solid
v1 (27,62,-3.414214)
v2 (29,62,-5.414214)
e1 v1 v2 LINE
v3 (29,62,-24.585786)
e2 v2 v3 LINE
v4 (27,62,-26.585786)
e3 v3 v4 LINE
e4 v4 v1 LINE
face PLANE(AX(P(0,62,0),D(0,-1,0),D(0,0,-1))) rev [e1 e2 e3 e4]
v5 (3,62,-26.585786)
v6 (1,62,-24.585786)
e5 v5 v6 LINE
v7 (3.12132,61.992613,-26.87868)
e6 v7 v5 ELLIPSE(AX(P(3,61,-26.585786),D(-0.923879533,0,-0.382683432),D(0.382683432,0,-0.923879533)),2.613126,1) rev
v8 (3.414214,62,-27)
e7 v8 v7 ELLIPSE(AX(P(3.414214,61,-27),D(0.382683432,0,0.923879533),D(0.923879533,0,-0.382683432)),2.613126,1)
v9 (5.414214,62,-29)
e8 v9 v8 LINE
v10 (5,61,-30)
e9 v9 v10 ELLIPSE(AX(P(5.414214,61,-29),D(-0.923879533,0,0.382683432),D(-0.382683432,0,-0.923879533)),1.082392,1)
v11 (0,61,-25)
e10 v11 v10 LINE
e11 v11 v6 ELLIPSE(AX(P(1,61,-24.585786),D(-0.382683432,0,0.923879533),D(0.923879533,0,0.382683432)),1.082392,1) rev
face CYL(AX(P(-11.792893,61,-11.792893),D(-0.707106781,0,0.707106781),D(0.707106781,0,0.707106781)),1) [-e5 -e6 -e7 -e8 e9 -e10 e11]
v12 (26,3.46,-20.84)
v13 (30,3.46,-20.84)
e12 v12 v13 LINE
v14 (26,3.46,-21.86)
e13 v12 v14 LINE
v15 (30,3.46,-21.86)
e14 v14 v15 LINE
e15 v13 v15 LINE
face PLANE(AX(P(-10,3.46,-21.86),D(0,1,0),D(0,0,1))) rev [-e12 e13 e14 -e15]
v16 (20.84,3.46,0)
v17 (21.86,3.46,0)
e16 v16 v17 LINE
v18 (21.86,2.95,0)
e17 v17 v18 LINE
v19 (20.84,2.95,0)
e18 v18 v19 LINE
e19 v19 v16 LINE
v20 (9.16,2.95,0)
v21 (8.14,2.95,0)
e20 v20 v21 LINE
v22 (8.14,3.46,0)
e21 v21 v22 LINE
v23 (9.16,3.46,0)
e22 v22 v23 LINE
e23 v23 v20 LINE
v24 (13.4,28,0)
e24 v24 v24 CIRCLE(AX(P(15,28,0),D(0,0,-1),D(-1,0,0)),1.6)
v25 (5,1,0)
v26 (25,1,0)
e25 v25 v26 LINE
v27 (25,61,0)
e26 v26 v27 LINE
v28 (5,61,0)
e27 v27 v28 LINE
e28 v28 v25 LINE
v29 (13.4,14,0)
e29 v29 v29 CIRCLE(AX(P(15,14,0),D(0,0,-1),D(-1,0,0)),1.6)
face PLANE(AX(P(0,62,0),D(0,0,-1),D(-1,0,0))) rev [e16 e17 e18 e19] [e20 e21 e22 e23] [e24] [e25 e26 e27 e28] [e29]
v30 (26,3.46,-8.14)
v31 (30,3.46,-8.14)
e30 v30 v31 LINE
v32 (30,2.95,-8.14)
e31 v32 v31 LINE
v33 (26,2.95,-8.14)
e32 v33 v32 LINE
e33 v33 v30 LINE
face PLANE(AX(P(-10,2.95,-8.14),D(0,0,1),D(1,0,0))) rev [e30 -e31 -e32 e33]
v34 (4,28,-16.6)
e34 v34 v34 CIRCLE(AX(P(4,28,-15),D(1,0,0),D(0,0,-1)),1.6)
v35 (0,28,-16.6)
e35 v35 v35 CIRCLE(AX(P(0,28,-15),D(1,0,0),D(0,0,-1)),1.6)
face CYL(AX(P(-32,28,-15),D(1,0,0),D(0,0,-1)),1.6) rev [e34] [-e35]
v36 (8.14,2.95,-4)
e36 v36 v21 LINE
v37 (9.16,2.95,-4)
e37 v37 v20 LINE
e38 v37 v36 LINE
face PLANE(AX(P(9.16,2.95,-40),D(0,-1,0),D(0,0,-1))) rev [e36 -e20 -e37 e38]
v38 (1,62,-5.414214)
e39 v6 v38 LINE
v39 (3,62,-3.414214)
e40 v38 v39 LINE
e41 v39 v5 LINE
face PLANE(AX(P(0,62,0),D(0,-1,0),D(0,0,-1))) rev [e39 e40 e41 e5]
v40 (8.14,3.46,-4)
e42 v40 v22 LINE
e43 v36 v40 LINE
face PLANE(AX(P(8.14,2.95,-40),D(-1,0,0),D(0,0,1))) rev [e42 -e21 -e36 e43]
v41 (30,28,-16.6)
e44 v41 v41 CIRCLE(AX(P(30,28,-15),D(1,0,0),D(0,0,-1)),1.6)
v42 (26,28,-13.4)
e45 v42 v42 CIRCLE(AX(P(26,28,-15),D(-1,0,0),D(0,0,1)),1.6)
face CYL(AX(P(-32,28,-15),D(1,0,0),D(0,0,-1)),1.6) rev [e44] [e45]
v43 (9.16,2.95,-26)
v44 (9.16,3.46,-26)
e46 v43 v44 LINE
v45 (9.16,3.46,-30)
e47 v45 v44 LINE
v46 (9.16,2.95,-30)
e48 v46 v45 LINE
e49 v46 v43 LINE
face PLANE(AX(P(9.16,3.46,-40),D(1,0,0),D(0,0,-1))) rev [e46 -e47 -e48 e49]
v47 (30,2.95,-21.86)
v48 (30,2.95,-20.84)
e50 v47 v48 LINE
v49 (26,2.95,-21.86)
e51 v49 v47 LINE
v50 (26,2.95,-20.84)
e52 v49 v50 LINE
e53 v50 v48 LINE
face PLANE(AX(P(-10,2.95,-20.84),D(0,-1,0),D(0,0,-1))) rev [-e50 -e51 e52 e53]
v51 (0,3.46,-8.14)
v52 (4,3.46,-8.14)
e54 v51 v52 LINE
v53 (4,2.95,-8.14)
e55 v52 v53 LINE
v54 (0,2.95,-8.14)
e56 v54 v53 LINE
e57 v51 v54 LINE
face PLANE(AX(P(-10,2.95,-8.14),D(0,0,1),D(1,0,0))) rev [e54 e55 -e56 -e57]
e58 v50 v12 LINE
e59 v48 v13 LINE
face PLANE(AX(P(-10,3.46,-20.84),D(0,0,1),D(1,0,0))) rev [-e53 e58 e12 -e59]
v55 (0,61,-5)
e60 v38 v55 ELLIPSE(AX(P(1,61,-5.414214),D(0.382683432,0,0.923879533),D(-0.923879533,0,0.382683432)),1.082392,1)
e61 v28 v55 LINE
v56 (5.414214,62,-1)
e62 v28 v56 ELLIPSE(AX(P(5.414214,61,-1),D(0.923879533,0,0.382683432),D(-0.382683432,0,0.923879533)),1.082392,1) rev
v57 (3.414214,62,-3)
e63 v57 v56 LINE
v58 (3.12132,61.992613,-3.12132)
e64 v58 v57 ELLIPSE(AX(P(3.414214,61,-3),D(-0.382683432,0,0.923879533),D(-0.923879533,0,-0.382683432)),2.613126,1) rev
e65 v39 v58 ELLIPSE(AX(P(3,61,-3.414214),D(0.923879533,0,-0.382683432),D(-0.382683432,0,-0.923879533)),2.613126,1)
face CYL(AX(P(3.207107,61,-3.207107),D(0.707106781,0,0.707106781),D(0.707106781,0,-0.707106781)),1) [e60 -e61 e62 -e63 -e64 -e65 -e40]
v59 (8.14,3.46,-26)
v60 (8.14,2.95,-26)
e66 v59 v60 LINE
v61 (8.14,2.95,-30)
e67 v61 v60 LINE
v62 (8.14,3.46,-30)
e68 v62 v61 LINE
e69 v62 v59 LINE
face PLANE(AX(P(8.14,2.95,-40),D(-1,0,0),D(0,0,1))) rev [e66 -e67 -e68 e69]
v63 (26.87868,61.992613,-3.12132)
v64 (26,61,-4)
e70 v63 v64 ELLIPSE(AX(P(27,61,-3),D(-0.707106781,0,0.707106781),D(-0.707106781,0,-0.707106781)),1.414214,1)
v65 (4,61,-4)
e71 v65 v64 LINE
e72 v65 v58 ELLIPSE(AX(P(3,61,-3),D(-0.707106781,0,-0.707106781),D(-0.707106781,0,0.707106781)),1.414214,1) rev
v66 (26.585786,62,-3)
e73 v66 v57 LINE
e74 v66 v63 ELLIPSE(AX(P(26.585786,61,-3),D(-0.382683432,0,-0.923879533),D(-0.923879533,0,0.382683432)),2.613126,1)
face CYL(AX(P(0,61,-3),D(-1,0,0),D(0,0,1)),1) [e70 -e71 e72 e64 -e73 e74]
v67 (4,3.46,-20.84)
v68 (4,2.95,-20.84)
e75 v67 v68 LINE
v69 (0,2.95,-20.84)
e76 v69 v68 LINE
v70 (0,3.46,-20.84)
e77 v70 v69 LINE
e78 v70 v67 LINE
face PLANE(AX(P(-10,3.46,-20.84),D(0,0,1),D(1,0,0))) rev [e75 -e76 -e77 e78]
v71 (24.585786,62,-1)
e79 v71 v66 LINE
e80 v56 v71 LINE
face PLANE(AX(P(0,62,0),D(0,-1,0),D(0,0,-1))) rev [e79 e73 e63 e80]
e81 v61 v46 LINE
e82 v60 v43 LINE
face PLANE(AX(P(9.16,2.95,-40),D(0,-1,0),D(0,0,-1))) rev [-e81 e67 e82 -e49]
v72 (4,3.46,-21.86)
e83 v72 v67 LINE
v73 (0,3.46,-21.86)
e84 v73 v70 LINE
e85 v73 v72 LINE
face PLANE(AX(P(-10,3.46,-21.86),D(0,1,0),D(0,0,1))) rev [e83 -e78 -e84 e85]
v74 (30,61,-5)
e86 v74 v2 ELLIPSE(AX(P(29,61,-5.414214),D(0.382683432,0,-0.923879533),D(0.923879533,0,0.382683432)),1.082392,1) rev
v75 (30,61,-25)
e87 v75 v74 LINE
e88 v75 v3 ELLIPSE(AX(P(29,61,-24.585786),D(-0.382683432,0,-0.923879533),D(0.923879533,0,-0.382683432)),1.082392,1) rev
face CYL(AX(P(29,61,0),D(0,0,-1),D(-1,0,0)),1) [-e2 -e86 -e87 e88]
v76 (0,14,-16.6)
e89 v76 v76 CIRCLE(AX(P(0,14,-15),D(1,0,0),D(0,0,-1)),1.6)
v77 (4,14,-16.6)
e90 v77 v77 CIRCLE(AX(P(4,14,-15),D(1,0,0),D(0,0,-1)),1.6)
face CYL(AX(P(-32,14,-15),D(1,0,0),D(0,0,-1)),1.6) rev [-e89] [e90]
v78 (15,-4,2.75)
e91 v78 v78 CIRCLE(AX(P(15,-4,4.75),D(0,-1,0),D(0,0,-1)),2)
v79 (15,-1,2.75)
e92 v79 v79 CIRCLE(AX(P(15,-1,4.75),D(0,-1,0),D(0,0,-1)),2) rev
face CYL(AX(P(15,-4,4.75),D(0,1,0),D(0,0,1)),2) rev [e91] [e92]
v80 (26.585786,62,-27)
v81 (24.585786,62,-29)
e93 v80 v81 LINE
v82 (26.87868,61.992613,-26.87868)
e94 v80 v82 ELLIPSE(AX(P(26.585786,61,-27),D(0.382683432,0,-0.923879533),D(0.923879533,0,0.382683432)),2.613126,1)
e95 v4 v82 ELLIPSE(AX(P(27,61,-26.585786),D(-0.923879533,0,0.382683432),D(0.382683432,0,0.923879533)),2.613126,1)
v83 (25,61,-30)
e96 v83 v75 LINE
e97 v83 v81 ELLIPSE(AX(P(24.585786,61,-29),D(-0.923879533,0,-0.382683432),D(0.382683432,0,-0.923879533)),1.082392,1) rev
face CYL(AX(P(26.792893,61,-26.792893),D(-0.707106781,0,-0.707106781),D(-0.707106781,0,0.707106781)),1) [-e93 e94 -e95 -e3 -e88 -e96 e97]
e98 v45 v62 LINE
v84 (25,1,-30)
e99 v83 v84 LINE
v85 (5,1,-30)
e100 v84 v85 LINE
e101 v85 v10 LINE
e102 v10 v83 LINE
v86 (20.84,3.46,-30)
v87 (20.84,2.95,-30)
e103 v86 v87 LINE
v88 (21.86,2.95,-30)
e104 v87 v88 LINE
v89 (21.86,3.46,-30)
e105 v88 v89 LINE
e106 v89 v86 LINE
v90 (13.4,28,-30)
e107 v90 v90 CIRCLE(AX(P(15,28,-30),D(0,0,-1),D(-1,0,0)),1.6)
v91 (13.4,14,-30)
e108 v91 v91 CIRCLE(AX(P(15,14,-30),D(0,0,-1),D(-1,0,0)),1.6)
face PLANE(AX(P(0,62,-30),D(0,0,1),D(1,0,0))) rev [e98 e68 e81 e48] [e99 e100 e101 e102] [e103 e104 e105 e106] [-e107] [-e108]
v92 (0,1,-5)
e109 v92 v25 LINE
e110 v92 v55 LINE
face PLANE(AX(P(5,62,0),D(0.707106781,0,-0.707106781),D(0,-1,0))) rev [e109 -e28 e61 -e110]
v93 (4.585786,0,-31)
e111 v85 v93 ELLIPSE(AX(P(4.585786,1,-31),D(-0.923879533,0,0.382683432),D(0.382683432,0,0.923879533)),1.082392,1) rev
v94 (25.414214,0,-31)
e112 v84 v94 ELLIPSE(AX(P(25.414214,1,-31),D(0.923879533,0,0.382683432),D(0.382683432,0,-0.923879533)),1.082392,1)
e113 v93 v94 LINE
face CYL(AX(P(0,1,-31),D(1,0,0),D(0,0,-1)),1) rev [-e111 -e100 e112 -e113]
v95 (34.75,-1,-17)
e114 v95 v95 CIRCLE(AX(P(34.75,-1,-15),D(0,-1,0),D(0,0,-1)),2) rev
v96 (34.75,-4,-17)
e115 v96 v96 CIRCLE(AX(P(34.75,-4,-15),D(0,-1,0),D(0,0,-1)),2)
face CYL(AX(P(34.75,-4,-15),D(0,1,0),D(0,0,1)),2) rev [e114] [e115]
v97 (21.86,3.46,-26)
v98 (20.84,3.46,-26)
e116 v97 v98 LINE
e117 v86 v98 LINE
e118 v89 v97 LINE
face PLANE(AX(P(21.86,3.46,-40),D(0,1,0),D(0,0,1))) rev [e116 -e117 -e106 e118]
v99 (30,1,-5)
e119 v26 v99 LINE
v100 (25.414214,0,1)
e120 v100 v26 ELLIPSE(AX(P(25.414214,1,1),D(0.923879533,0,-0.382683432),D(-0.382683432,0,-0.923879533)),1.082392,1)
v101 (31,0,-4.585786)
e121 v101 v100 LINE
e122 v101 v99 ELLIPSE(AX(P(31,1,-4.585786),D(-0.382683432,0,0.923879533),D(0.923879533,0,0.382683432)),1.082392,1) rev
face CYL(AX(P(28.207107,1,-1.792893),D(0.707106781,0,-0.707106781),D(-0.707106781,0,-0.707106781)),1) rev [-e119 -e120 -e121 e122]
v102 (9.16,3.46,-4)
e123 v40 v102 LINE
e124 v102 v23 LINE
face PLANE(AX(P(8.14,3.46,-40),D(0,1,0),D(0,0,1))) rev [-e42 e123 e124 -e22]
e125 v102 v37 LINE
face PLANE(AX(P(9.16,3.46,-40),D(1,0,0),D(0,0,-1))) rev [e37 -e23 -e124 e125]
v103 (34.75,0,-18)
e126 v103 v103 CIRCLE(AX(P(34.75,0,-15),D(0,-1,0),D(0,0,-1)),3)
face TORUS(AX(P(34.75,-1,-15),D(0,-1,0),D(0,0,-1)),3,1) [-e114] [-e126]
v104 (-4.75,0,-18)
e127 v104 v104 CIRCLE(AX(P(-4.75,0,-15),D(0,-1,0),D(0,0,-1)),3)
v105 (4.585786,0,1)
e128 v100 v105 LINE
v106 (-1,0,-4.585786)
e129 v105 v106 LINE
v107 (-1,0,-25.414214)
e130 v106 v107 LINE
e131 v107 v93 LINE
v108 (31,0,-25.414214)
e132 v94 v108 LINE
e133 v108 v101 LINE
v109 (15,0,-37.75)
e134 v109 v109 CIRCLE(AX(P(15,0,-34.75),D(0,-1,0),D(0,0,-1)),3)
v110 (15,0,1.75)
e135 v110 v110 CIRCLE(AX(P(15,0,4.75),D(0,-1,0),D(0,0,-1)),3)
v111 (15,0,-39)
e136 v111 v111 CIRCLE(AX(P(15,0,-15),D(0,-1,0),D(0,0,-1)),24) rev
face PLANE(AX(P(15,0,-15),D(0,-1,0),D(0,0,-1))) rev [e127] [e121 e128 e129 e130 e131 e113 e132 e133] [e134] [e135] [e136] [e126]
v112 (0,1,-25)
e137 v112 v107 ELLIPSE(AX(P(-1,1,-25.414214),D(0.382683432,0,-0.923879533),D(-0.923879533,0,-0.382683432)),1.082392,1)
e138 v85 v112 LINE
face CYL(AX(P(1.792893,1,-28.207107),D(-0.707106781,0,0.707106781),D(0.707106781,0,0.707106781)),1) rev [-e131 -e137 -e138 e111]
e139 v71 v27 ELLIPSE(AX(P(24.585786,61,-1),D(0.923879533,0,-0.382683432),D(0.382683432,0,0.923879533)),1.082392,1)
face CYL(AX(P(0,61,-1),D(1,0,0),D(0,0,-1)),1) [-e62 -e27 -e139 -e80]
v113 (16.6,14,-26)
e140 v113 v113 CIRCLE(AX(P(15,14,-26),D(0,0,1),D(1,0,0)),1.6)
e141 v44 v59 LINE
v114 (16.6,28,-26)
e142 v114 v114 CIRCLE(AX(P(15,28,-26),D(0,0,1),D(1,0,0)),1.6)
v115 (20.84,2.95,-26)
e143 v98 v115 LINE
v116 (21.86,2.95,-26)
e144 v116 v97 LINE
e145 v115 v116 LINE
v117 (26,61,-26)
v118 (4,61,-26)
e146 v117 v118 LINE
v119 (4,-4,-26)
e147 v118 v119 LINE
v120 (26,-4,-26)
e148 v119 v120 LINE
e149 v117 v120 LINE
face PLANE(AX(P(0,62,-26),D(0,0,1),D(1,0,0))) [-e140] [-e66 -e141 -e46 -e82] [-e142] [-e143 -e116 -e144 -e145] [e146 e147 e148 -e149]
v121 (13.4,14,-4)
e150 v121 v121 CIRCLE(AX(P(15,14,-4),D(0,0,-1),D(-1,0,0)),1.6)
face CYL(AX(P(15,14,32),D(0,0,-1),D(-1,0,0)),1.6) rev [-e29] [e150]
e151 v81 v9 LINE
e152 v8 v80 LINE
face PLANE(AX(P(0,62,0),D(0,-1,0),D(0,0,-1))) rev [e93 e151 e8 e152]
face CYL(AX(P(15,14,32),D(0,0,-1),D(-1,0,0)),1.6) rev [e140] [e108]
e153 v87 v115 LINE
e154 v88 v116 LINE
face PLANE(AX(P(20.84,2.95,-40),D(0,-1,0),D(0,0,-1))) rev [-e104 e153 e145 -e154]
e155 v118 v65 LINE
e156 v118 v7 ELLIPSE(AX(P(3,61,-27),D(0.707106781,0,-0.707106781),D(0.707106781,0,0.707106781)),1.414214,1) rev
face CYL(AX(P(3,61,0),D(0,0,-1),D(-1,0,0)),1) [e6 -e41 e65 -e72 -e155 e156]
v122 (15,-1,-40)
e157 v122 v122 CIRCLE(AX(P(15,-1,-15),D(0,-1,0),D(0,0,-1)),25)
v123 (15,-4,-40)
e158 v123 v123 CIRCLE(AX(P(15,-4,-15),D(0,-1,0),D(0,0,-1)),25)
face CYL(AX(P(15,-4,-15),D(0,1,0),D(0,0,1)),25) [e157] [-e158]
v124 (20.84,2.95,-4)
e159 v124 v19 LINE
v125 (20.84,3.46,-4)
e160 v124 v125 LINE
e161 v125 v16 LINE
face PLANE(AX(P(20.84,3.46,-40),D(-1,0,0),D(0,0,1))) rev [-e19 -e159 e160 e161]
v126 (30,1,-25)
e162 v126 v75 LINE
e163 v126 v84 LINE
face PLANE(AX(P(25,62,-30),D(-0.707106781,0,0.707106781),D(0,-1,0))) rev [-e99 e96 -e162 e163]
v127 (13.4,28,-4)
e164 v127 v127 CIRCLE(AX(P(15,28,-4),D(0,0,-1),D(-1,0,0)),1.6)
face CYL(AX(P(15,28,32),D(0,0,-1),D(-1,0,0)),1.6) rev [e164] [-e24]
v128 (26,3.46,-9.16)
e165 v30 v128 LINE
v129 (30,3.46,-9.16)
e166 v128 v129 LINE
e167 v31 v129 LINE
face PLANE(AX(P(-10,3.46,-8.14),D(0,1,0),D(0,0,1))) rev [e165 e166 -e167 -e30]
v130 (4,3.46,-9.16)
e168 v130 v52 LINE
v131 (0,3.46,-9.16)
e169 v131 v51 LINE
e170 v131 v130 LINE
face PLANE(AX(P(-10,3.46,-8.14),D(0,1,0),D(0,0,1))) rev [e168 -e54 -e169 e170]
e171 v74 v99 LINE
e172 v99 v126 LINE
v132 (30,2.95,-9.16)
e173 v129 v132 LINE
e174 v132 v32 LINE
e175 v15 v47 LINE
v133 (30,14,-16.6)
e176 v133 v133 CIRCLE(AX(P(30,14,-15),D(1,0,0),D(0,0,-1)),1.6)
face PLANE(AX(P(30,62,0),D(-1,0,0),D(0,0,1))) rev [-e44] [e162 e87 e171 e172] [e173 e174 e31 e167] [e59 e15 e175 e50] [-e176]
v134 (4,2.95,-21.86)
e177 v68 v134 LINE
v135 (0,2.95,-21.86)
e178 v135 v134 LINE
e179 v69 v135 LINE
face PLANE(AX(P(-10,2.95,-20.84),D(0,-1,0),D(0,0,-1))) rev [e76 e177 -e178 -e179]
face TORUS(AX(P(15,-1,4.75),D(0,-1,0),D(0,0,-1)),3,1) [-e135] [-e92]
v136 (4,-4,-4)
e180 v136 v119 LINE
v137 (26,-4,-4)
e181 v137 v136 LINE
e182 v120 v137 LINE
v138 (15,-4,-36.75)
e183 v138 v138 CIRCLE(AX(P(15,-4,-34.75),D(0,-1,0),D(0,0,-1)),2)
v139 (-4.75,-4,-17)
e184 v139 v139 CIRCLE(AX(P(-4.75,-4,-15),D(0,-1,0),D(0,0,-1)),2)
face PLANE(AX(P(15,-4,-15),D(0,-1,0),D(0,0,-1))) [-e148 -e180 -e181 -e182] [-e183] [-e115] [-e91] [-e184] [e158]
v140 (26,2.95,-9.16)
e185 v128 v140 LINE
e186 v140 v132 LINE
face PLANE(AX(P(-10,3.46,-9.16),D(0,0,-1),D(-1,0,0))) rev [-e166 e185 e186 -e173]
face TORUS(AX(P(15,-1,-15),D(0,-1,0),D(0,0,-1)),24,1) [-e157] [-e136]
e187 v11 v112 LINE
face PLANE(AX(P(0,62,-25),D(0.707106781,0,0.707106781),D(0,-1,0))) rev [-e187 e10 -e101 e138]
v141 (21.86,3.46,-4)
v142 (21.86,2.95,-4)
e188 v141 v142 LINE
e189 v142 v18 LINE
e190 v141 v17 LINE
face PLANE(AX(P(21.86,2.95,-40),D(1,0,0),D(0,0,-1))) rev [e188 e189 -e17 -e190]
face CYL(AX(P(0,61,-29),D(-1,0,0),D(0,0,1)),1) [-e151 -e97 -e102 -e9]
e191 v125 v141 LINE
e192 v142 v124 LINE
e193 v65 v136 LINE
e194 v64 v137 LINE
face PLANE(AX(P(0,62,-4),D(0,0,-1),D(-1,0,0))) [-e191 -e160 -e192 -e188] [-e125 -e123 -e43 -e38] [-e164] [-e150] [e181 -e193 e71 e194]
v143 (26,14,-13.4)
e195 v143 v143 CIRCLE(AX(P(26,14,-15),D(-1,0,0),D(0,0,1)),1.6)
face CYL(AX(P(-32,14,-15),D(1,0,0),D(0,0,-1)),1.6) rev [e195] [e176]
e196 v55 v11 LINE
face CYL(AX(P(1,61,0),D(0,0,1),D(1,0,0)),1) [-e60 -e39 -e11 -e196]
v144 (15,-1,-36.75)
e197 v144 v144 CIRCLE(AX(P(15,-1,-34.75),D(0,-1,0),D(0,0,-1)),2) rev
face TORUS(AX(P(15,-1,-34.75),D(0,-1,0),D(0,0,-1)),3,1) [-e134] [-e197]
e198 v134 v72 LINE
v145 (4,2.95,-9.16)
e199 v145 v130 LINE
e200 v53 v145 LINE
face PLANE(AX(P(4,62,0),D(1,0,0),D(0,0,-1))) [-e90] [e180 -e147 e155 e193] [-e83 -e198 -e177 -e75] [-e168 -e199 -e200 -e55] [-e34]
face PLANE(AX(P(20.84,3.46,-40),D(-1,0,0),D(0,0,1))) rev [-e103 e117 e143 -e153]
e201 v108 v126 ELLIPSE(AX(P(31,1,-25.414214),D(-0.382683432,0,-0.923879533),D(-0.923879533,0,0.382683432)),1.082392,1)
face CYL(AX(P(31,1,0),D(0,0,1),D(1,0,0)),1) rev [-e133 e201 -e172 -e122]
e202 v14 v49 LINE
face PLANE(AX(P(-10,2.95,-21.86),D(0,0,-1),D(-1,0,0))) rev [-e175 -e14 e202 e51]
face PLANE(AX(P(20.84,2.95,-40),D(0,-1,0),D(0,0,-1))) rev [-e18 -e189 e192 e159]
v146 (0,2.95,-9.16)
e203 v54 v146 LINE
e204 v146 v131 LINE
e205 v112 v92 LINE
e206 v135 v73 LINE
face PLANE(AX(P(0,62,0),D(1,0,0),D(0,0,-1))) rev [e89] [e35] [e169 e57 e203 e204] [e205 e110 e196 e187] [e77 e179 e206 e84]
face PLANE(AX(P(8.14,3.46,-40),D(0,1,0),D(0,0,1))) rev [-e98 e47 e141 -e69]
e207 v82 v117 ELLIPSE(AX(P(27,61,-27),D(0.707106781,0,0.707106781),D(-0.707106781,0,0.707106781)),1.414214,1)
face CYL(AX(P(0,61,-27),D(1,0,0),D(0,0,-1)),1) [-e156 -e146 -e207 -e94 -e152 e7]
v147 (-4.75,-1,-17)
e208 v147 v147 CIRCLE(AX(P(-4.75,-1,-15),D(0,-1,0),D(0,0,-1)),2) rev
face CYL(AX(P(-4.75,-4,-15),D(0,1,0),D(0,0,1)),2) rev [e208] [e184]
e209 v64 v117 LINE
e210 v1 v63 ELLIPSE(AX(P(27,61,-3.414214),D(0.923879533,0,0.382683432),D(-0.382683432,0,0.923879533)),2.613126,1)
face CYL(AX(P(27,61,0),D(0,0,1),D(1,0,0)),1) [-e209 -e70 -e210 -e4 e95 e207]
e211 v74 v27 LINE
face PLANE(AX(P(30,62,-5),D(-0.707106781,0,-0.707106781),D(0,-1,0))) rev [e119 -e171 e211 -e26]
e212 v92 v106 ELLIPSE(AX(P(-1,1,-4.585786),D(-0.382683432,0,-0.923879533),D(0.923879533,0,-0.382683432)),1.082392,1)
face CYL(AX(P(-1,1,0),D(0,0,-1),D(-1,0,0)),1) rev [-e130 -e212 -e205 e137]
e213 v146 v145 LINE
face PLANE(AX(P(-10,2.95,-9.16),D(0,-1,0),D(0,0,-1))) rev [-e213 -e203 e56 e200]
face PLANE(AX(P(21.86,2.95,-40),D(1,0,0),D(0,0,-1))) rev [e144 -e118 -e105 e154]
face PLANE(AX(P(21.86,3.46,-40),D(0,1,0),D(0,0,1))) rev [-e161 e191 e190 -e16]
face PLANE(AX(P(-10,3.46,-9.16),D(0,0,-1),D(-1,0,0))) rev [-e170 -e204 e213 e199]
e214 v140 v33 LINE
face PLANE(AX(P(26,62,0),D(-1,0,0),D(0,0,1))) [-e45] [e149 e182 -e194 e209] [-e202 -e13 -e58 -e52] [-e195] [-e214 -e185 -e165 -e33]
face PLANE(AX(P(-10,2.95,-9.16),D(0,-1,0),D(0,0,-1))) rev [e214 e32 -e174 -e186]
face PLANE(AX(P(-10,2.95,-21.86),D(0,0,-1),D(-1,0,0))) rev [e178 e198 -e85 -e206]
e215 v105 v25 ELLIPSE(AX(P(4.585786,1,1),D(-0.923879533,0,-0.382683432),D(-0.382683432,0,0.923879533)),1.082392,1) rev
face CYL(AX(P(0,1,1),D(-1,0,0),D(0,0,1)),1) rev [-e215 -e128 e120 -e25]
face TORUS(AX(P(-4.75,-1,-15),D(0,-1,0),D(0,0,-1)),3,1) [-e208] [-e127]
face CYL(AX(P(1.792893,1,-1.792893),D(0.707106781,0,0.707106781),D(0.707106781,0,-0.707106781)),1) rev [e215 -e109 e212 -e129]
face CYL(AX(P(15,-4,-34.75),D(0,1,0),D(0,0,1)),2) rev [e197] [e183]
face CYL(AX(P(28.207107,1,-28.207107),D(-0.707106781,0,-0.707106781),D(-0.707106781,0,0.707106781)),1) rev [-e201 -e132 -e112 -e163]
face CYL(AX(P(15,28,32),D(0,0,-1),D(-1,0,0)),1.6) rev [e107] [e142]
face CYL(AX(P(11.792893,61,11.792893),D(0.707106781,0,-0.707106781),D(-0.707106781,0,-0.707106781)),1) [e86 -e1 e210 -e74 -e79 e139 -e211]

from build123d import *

# Parameters (mm, degrees)
SKETCH1_W           = 30
SKETCH1_H           = 30
BOSS_EXTRUDE1_DEPTH = 62
SHELL1_T            = -4
SKETCH2_R           = 1.6
CUT_EXTRUDE1_DEPTH  = 62
SKETCH3_R           = 25
SKETCH3_R_2         = 2
SKETCH3_W           = 22
SKETCH3_H           = 22
BOSS_EXTRUDE2_DEPTH = 4
CIRPATTERN1_COUNT   = 2
CIRPATTERN1_ANGLE   = 90
CHAMFER1_SIZE       = 5
FILLET1_R           = 1
FILLET2_R           = 1
SKETCH4_W           = 1.02
SKETCH4_H           = 0.51
CUT_EXTRUDE2_DEPTH  = 83.097503007
CIRPATTERN2_COUNT   = 2
CIRPATTERN2_ANGLE   = 90


with BuildPart() as part:
    # Sketch1 → Boss-Extrude1 (new body)
    with BuildSketch(Plane(origin=(0, 0, 0), x_dir=(1, 0, 0), z_dir=(0, 1, 0))):
        with Locations((15, 15)):
            Rectangle(SKETCH1_W, SKETCH1_H)
    extrude(amount=BOSS_EXTRUDE1_DEPTH)

    # Shell1
    shell1_openings = [part.faces().sort_by_distance(p)[0] for p in [
        (15, 62, -15),
        (15, 0, -15),
    ]]
    offset(amount=SHELL1_T, openings=shell1_openings, kind=Kind.INTERSECTION)

    # Sketch2 → Cut-Extrude1 (cut)
    with BuildSketch(Plane(origin=(30, 0, 0), x_dir=(0, 0, -1), z_dir=(1, 0, 0))):
        with Locations((15, 14)):
            Circle(SKETCH2_R)
        with Locations((15, 28)):
            Circle(SKETCH2_R)
    cut_extrude1 = extrude(amount=-CUT_EXTRUDE1_DEPTH, mode=Mode.SUBTRACT)

    # Sketch3 → Boss-Extrude2 (add)
    with BuildSketch(Plane.XZ):
        with Locations(Location((15, -15, 0), (0, 0, 270))):
            Circle(SKETCH3_R)
        with Locations(Location((34.75, -15, 0), (0, 0, 270))):
            Circle(SKETCH3_R_2, mode=Mode.SUBTRACT)
        with Locations(Location((15, -34.75, 0), (0, 0, 270))):
            Circle(SKETCH3_R_2, mode=Mode.SUBTRACT)
        with Locations(Location((-4.75, -15, 0), (0, 0, 270))):
            Circle(SKETCH3_R_2, mode=Mode.SUBTRACT)
        with Locations(Location((15, 4.75, 0), (0, 0, 270))):
            Circle(SKETCH3_R_2, mode=Mode.SUBTRACT)
        with Locations((15, -15)):
            Rectangle(SKETCH3_W, SKETCH3_H, mode=Mode.SUBTRACT)
    extrude(amount=BOSS_EXTRUDE2_DEPTH)

    # CirPattern1: Cut-Extrude1 ×2 about axis
    cirpattern1_axis = Axis((15, -4, -15), (0, 1, 0))
    for i in range(1, CIRPATTERN1_COUNT):
        add(cut_extrude1.rotate(cirpattern1_axis, i * CIRPATTERN1_ANGLE / (CIRPATTERN1_COUNT - 1)), mode=Mode.SUBTRACT)

    # Chamfer1
    chamfer1_edges = [part.edges().sort_by_distance(p)[0] for p in [
        (0, 31, -30),
        (30, 31, -30),
        (30, 31, 0),
        (0, 31, 0),
    ]]
    chamfer(chamfer1_edges, length=CHAMFER1_SIZE)

    # Fillet1
    # the kernel refuses this fillet: 1 mm, written as the material it takes off along each edge
    with BuildSketch(Plane(origin=(4, 62, -4), x_dir=(-1, 0, 0), z_dir=(0, 0, -1)), Plane(origin=(26, 62, -4), x_dir=(0, 0, 1), z_dir=(-1, 0, 0)), Plane(origin=(26, 62, -26), x_dir=(1, 0, 0), z_dir=(0, 0, 1)), Plane(origin=(4, 62, -26), x_dir=(0, 0, -1), z_dir=(1, 0, 0))) as fillet1_piece_1:
        with BuildLine():
            CenterArc((FILLET1_R, -FILLET1_R), FILLET1_R, 90, 90)
            Line((0, -FILLET1_R), (0, 0))
            Line((0, 0), (FILLET1_R, 0))
        make_face()
    extrude(amount=22, mode=Mode.SUBTRACT)
    with BuildSketch(Plane(origin=(2.5, 62, 0), x_dir=(0, -1, 0), z_dir=(1, 0, 0))) as fillet1_piece_2:
        with BuildLine():
            CenterArc((FILLET1_R, FILLET1_R), FILLET1_R, 180, 90)
            Line((0, FILLET1_R), (0, 0))
            Line((0, 0), (FILLET1_R, 0))
        make_face()
    extrude(amount=25, mode=Mode.SUBTRACT)
    with BuildSketch(Plane(origin=(0, 62, -27.5), x_dir=(1, 0, 0), z_dir=(0, 0, 1)), Plane(origin=(30, 62, -2.5), x_dir=(-1, 0, 0), z_dir=(0, 0, -1)), Plane(origin=(27.5, 62, -30), x_dir=(0, 0, 1), z_dir=(-1, 0, 0))) as fillet1_piece_3:
        with BuildLine():
            CenterArc((FILLET1_R, -FILLET1_R), FILLET1_R, 90, 90)
            Line((0, -FILLET1_R), (0, 0))
            Line((0, 0), (FILLET1_R, 0))
        make_face()
    extrude(amount=25, mode=Mode.SUBTRACT)
    with BuildSketch(Plane(origin=(-1.767766953, 62, -23.232233047), x_dir=(0.7071067811865476, 0, 0.7071067811865476), z_dir=(0.7071067811865476, 0, -0.7071067811865476)), Plane(origin=(23.232233047, 62, 1.767766953), x_dir=(0, -1, 0), z_dir=(0.7071067811865476, 0, -0.7071067811865476))) as fillet1_piece_4:
        with BuildLine():
            CenterArc((FILLET1_R, FILLET1_R), FILLET1_R, 180, 90)
            Line((0, FILLET1_R), (0, 0))
            Line((0, 0), (FILLET1_R, 0))
        make_face()
    extrude(amount=12.071067812, mode=Mode.SUBTRACT)
    with BuildSketch(Plane(origin=(31.767766953, 62, -23.232233047), x_dir=(-0.7071067811865476, 0, 0.7071067811865476), z_dir=(-0.7071067811865476, 0, -0.7071067811865476)), Plane(origin=(6.767766953, 62, 1.767766953), x_dir=(0, -1, 0), z_dir=(-0.7071067811865476, 0, -0.7071067811865476))) as fillet1_piece_5:
        with BuildLine():
            CenterArc((FILLET1_R, -FILLET1_R), FILLET1_R, 90, 90)
            Line((0, -FILLET1_R), (0, 0))
            Line((0, 0), (FILLET1_R, 0))
        make_face()
    extrude(amount=12.071067812, mode=Mode.SUBTRACT)
    with BuildSketch(Plane(origin=(26, 62, -4), x_dir=(0, 0, 1), z_dir=(-1, 0, 0))) as fillet1_piece_6a_section:
        with BuildLine():
            CenterArc((FILLET1_R, -FILLET1_R), FILLET1_R, 90, 90)
            Line((0, -FILLET1_R), (0, 0))
            Line((0, 0), (FILLET1_R, 0))
        make_face()
    fillet1_piece_6a = extrude(amount=24.5, mode=Mode.PRIVATE)
    fillet1_piece_6a = split(fillet1_piece_6a, bisect_by=Plane(origin=(4, 61.773604886, -3.773604886), z_dir=(-1, 0, 0)), keep=Keep.TOP, mode=Mode.PRIVATE)
    with BuildSketch(Plane(origin=(4, 62, -1.5), x_dir=(-1, 0, 0), z_dir=(0, 0, -1))) as fillet1_piece_6b_section:
        with BuildLine():
            CenterArc((FILLET1_R, -FILLET1_R), FILLET1_R, 90, 90)
            Line((0, -FILLET1_R), (0, 0))
            Line((0, 0), (FILLET1_R, 0))
        make_face()
    fillet1_piece_6b = extrude(amount=24.5, mode=Mode.PRIVATE)
    fillet1_piece_6b = split(fillet1_piece_6b, bisect_by=Plane(origin=(3.773604886, 61.773604886, -4), z_dir=(0, 0, 1)), keep=Keep.TOP, mode=Mode.PRIVATE)
    fillet1_piece_6 = fillet1_piece_6a & fillet1_piece_6b
    add(fillet1_piece_6, mode=Mode.SUBTRACT)
    with BuildSketch(Plane(origin=(4, 62, -4), x_dir=(-1, 0, 0), z_dir=(0, 0, -1))) as fillet1_piece_7a_section:
        with BuildLine():
            CenterArc((FILLET1_R, -FILLET1_R), FILLET1_R, 90, 90)
            Line((0, -FILLET1_R), (0, 0))
            Line((0, 0), (FILLET1_R, 0))
        make_face()
    fillet1_piece_7a = extrude(amount=24.5, mode=Mode.PRIVATE)
    fillet1_piece_7a = split(fillet1_piece_7a, bisect_by=Plane(origin=(3.773604886, 61.773604886, -26), z_dir=(0, 0, -1)), keep=Keep.TOP, mode=Mode.PRIVATE)
    with BuildSketch(Plane(origin=(1.5, 62, -26), x_dir=(0, 0, -1), z_dir=(1, 0, 0))) as fillet1_piece_7b_section:
        with BuildLine():
            CenterArc((FILLET1_R, -FILLET1_R), FILLET1_R, 90, 90)
            Line((0, -FILLET1_R), (0, 0))
            Line((0, 0), (FILLET1_R, 0))
        make_face()
    fillet1_piece_7b = extrude(amount=24.5, mode=Mode.PRIVATE)
    fillet1_piece_7b = split(fillet1_piece_7b, bisect_by=Plane(origin=(4, 61.773604886, -26.226395114), z_dir=(-1, 0, 0)), keep=Keep.TOP, mode=Mode.PRIVATE)
    fillet1_piece_7 = fillet1_piece_7a & fillet1_piece_7b
    add(fillet1_piece_7, mode=Mode.SUBTRACT)
    with BuildSketch(Plane(origin=(28.5, 62, -4), x_dir=(0, 0, 1), z_dir=(-1, 0, 0))) as fillet1_piece_8a_section:
        with BuildLine():
            CenterArc((FILLET1_R, -FILLET1_R), FILLET1_R, 90, 90)
            Line((0, -FILLET1_R), (0, 0))
            Line((0, 0), (FILLET1_R, 0))
        make_face()
    fillet1_piece_8a = extrude(amount=24.5, mode=Mode.PRIVATE)
    fillet1_piece_8a = split(fillet1_piece_8a, bisect_by=Plane(origin=(26, 61.773604886, -3.773604886), z_dir=(1, 0, 0)), keep=Keep.TOP, mode=Mode.PRIVATE)
    with BuildSketch(Plane(origin=(26, 62, -26), x_dir=(1, 0, 0), z_dir=(0, 0, 1))) as fillet1_piece_8b_section:
        with BuildLine():
            CenterArc((FILLET1_R, -FILLET1_R), FILLET1_R, 90, 90)
            Line((0, -FILLET1_R), (0, 0))
            Line((0, 0), (FILLET1_R, 0))
        make_face()
    fillet1_piece_8b = extrude(amount=24.5, mode=Mode.PRIVATE)
    fillet1_piece_8b = split(fillet1_piece_8b, bisect_by=Plane(origin=(26.226395114, 61.773604886, -4), z_dir=(0, 0, 1)), keep=Keep.TOP, mode=Mode.PRIVATE)
    fillet1_piece_8 = fillet1_piece_8a & fillet1_piece_8b
    add(fillet1_piece_8, mode=Mode.SUBTRACT)
    with BuildSketch(Plane(origin=(4, 62, -26), x_dir=(0, 0, -1), z_dir=(1, 0, 0))) as fillet1_piece_9a_section:
        with BuildLine():
            CenterArc((FILLET1_R, -FILLET1_R), FILLET1_R, 90, 90)
            Line((0, -FILLET1_R), (0, 0))
            Line((0, 0), (FILLET1_R, 0))
        make_face()
    fillet1_piece_9a = extrude(amount=24.5, mode=Mode.PRIVATE)
    fillet1_piece_9a = split(fillet1_piece_9a, bisect_by=Plane(origin=(26, 61.773604886, -26.226395114), z_dir=(1, 0, 0)), keep=Keep.TOP, mode=Mode.PRIVATE)
    with BuildSketch(Plane(origin=(26, 62, -28.5), x_dir=(1, 0, 0), z_dir=(0, 0, 1))) as fillet1_piece_9b_section:
        with BuildLine():
            CenterArc((FILLET1_R, -FILLET1_R), FILLET1_R, 90, 90)
            Line((0, -FILLET1_R), (0, 0))
            Line((0, 0), (FILLET1_R, 0))
        make_face()
    fillet1_piece_9b = extrude(amount=24.5, mode=Mode.PRIVATE)
    fillet1_piece_9b = split(fillet1_piece_9b, bisect_by=Plane(origin=(26.226395114, 61.773604886, -26), z_dir=(0, 0, -1)), keep=Keep.TOP, mode=Mode.PRIVATE)
    fillet1_piece_9 = fillet1_piece_9a & fillet1_piece_9b
    add(fillet1_piece_9, mode=Mode.SUBTRACT)

    # Fillet2
    fillet2_edges = [part.edges().sort_by_distance(p)[0] for p in [
        (34.75, 0, -13),
        (15, 0, -32.75),
        (-4.75, 0, -13),
        (15, 0, 6.75),
        (15, 0, 10),
        (15, 0, 0),
        (0, 0, -15),
        (30, 0, -15),
        (15, 0, -30),
        (2.5, 0, -2.5),
        (27.5, 0, -2.5),
        (27.5, 0, -27.5),
        (2.5, 0, -27.5),
    ]]
    fillet(fillet2_edges, radius=FILLET2_R)

    # Sketch4 → Cut-Extrude2 (cut, symmetric)
    with BuildSketch(Plane(origin=(4, 0, 0), x_dir=(0, 0, -1), z_dir=(1, 0, 0))):
        with Locations((8.65, 3.205)):
            Rectangle(SKETCH4_W, SKETCH4_H)
        with Locations((21.35, 3.205)):
            Rectangle(SKETCH4_W, SKETCH4_H)
    cut_extrude2 = extrude(amount=CUT_EXTRUDE2_DEPTH, both=True, mode=Mode.SUBTRACT)

    # CirPattern2: Cut-Extrude2 ×2 about axis
    cirpattern2_axis = Axis((15, -4, -15), (0, -1, 0))
    for i in range(1, CIRPATTERN2_COUNT):
        add(cut_extrude2.rotate(cirpattern2_axis, i * CIRPATTERN2_ANGLE / (CIRPATTERN2_COUNT - 1)), mode=Mode.SUBTRACT)


solid = part.part
